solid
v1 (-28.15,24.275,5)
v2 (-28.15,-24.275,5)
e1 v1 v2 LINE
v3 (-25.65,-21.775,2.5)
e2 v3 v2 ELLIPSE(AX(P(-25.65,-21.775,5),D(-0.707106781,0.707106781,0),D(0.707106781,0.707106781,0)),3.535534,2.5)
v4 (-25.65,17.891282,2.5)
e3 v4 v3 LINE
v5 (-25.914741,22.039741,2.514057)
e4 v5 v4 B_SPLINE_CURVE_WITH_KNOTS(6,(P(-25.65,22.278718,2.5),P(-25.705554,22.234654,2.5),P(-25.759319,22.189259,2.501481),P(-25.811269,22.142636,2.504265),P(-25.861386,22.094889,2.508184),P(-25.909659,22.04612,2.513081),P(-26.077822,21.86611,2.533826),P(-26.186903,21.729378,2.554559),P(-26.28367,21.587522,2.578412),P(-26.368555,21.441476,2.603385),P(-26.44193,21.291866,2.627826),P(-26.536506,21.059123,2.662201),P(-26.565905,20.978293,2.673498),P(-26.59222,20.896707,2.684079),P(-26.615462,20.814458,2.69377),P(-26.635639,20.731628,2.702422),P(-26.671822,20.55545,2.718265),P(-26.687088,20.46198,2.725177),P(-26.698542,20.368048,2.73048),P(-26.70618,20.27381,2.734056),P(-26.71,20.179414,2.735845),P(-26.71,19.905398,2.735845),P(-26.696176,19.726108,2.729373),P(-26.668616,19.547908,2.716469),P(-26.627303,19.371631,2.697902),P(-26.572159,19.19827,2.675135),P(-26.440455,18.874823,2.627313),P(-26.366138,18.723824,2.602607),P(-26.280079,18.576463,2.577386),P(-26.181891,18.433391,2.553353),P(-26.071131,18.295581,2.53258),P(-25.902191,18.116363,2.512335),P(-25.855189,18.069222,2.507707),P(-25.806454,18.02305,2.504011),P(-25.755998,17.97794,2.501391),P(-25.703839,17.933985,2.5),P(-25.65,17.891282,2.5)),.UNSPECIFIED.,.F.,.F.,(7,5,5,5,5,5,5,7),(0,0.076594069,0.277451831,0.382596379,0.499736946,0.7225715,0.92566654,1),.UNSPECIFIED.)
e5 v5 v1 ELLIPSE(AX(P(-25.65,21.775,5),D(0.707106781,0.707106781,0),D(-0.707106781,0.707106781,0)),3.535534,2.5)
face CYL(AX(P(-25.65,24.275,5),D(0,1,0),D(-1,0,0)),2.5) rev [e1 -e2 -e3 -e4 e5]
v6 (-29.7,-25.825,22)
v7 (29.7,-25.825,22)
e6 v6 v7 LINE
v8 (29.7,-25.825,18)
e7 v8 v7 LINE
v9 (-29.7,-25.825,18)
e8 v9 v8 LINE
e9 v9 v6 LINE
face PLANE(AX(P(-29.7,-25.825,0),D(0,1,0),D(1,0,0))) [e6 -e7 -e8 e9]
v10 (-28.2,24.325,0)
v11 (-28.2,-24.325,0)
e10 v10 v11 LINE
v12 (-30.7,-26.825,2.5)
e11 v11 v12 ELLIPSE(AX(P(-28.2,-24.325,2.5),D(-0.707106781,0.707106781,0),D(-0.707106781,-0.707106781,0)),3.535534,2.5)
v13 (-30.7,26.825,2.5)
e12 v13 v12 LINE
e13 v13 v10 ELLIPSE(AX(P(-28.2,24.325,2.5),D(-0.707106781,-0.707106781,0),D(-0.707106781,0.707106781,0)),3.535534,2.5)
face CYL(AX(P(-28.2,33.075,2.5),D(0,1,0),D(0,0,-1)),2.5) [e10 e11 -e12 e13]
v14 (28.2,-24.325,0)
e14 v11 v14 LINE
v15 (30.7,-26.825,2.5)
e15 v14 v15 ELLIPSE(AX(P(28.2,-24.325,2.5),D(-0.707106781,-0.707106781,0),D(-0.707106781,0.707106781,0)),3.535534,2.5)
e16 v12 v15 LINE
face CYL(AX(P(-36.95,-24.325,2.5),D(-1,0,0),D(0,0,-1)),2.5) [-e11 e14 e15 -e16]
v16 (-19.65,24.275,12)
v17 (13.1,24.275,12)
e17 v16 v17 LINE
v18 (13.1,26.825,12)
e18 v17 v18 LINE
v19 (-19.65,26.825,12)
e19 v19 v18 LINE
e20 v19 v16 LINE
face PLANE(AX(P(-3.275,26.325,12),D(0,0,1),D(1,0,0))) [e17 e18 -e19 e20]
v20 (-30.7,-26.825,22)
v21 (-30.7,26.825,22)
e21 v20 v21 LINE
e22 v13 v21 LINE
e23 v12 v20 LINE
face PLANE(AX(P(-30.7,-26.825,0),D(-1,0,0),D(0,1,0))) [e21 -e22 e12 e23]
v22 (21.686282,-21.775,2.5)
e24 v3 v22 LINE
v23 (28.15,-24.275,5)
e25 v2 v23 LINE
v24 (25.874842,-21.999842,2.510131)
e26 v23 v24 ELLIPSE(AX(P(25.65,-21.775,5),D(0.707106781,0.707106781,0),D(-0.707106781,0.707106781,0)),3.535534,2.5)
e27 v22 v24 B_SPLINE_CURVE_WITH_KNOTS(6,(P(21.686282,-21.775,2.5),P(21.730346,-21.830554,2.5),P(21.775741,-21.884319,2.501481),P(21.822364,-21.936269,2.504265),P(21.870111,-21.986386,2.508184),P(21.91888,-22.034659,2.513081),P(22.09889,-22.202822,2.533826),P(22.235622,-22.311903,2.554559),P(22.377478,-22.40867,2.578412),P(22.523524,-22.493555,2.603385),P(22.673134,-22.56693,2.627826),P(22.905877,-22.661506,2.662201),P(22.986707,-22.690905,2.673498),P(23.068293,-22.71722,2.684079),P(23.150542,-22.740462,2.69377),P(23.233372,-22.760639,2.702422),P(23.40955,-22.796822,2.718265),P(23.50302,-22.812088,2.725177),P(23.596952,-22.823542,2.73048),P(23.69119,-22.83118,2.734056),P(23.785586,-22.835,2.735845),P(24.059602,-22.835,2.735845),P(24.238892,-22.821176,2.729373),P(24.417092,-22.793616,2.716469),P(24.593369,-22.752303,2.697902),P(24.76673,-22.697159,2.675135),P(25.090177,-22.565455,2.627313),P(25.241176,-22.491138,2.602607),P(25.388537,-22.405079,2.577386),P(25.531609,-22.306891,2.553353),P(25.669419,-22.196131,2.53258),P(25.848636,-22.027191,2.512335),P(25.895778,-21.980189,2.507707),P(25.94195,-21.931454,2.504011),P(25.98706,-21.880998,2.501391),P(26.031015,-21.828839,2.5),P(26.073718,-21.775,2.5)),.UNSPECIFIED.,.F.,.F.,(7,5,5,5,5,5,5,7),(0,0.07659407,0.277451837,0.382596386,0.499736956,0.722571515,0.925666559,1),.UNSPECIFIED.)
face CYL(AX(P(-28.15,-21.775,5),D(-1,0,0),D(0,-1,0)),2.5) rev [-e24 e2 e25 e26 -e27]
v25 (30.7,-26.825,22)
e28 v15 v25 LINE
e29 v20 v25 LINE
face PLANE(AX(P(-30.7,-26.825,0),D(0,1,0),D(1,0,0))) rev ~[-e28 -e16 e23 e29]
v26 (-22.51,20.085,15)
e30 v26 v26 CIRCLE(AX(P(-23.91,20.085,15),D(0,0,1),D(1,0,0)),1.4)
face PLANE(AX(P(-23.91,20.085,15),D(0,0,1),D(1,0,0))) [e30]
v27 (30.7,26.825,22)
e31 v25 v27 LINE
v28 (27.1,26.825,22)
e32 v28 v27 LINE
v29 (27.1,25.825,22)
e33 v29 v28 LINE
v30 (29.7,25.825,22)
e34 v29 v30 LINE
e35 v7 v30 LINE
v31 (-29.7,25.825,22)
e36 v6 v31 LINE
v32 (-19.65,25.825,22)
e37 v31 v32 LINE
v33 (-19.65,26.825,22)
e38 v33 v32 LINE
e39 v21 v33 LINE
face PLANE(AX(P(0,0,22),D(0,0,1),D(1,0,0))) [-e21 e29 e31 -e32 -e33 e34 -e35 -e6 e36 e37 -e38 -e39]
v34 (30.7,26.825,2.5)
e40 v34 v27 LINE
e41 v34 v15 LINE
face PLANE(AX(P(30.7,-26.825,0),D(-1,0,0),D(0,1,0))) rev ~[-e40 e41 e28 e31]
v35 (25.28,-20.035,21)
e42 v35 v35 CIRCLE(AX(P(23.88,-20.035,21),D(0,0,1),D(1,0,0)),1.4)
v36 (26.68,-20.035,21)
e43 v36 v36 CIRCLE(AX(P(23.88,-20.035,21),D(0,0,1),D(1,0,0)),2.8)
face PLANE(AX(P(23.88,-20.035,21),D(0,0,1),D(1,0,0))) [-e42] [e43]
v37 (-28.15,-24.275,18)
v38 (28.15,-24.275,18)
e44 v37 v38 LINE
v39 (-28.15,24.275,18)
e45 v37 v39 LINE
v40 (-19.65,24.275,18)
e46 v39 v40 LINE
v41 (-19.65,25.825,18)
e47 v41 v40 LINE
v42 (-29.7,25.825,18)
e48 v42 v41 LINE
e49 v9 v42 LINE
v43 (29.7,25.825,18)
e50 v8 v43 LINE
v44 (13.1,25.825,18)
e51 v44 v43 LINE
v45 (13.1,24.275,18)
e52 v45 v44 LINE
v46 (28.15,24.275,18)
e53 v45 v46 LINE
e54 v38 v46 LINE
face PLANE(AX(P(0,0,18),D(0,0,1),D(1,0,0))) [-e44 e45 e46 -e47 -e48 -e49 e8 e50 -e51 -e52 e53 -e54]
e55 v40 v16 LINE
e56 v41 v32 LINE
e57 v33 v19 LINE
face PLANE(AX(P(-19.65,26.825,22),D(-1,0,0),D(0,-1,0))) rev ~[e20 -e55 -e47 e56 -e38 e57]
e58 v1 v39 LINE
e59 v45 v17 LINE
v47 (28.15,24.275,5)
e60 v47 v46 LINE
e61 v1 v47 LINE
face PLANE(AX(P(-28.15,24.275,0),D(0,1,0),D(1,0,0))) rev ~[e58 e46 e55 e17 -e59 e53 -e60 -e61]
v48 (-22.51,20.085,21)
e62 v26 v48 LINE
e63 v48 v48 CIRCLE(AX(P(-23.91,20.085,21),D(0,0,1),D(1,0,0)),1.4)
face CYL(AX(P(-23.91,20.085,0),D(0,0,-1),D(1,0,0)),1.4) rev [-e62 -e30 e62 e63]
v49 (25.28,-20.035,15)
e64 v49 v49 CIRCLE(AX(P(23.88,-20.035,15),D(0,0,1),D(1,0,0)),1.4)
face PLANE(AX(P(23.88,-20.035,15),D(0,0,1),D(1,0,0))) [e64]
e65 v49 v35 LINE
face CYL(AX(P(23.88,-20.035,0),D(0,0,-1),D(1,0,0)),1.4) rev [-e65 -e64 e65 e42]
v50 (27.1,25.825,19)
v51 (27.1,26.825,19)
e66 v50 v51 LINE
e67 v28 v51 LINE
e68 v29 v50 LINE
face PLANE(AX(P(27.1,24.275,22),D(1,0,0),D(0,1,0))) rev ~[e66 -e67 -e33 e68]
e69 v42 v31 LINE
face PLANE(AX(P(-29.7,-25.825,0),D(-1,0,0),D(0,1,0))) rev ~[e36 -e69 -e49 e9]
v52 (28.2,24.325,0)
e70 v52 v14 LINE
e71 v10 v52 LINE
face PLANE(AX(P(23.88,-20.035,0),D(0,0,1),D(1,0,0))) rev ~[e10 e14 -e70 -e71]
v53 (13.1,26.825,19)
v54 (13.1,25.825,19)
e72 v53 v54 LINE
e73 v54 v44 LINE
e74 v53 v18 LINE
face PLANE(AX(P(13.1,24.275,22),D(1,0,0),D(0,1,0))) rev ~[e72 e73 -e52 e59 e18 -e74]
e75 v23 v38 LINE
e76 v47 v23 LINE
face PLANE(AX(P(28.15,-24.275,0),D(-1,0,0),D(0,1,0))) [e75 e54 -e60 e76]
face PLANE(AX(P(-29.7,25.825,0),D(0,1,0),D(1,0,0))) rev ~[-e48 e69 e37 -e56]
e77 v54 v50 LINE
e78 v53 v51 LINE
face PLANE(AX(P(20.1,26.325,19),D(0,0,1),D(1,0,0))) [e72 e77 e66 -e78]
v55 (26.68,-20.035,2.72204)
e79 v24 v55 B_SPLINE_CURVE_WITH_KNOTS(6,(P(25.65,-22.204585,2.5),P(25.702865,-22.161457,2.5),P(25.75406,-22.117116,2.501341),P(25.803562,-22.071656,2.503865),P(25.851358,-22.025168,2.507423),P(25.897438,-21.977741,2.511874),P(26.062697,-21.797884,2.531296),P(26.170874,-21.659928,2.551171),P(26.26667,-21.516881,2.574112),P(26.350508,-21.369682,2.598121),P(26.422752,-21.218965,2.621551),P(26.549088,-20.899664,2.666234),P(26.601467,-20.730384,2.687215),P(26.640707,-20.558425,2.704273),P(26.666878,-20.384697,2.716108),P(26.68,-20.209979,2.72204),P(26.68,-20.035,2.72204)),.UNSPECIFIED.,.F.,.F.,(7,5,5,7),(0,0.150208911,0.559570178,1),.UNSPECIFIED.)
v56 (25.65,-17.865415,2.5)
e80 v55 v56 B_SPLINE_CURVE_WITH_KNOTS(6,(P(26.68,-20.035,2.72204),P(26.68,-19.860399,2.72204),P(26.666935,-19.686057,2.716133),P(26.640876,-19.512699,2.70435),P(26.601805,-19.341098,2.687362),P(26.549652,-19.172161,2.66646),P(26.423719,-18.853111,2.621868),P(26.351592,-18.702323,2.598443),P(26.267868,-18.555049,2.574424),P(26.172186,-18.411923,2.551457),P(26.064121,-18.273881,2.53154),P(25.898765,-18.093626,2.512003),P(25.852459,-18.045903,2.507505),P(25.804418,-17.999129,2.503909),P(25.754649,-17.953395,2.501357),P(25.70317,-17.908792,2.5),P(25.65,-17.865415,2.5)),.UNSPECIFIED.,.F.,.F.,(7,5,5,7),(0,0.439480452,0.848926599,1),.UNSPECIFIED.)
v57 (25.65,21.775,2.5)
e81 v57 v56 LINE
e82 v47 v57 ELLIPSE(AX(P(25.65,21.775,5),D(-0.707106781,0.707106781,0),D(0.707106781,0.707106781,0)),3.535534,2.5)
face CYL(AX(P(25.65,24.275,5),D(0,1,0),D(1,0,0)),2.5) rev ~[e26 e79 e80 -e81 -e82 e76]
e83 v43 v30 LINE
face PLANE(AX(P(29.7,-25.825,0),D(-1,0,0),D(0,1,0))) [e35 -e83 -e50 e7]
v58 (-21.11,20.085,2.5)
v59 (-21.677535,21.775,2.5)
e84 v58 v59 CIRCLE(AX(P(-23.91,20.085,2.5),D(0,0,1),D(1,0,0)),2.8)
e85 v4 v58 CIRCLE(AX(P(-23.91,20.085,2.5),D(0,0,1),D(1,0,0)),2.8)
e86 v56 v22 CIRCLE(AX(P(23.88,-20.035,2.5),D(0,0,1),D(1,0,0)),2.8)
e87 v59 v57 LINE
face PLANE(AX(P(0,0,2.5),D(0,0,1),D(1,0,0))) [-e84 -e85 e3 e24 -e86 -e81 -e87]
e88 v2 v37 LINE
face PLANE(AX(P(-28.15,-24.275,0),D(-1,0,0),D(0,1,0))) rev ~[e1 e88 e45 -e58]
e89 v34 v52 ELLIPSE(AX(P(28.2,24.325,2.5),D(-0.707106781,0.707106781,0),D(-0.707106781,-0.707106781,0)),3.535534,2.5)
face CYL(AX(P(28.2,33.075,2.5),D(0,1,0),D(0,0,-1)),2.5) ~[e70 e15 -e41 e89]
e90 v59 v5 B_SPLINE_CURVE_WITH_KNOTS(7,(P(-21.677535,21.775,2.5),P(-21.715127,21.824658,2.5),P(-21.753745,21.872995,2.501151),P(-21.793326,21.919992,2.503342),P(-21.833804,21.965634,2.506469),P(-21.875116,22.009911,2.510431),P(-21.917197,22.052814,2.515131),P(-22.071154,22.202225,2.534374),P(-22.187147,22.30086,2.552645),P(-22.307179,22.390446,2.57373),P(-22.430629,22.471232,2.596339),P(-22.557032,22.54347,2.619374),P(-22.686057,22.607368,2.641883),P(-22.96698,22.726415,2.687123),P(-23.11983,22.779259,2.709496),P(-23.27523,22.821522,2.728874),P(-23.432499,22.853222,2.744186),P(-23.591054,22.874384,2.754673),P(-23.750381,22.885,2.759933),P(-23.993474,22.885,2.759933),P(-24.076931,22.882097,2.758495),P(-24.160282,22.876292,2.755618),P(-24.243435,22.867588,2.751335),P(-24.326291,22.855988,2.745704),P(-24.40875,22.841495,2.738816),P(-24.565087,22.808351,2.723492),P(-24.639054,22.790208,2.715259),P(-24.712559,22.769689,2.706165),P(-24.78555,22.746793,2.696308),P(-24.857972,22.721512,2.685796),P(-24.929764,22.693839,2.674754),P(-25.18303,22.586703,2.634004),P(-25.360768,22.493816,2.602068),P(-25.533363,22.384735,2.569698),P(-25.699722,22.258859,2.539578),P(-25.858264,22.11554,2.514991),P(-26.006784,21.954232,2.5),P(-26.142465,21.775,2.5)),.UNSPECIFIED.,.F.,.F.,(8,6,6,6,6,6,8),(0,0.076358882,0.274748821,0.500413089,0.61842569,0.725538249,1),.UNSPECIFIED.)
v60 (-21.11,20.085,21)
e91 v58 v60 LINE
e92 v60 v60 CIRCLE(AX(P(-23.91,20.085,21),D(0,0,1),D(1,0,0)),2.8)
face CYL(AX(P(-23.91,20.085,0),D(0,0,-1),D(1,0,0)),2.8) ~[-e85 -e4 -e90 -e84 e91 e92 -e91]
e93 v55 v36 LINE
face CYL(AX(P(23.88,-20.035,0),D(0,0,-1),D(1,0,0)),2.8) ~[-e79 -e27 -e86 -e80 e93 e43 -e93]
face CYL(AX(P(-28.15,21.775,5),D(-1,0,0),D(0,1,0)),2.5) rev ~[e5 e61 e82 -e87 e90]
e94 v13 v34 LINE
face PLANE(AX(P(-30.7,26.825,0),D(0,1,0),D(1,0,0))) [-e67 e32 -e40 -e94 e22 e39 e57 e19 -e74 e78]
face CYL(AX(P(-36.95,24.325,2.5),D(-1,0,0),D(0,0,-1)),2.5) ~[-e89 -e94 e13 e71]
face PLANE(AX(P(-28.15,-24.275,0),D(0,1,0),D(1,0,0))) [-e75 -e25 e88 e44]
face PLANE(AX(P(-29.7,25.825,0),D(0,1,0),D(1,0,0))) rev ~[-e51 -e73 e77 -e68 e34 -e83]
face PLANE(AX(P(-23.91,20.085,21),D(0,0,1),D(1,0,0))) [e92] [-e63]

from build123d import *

# Parameters (mm, degrees)
F0_W        = 56.3
F0_H        = 48.55
F0_R        = 2.8
F1_DEPTH    = 2.5
F0_W_2      = 59.4
F0_H_2      = 51.65
F2_DEPTH    = 18
F0_W_3      = 61.4
F0_H_3      = 53.65
F3_DEPTH    = 22
F0_R_2      = 1.4
F4_DEPTH    = 21
F5_DEPTH    = 15
F6_T1_DEPTH = 48.55
F6_T3_DEPTH = 56.3
F6_T5_DEPTH = 73.9
F6_T7_DEPTH = 66.15
F7_W        = 32.75
F7_H        = 1
F7_H_2      = 1.55
F8_DEPTH    = 10
F7_W_2      = 14
F9_DEPTH    = 3


# Not quite as in the source:
# - a fillet or chamfer that OpenCascade refuses, or shapes differently, is made with other operations: its cross-section is extruded or revolved along the edge and cut away or added


with BuildPart() as f1:
    # F0 (on Top) → F1 (new body)
    with BuildSketch(Plane.XY):
        Rectangle(F0_W, F0_H)
        with Locations((23.88, -20.035)):
            Circle(F0_R, mode=Mode.SUBTRACT)
        with Locations((-23.91, 20.085)):
            Circle(F0_R, mode=Mode.SUBTRACT)
    extrude(amount=F1_DEPTH)

    # F0 (on Top) → F2 (join)
    with BuildSketch(Plane.XY):
        Rectangle(F0_W_2, F0_H_2)
        Rectangle(F0_W, F0_H, mode=Mode.SUBTRACT)
    extrude(amount=F2_DEPTH)

    # F0 (on Top) → F3 (join)
    with BuildSketch(Plane.XY):
        Rectangle(F0_W_3, F0_H_3)
        Rectangle(F0_W_2, F0_H_2, mode=Mode.SUBTRACT)
    extrude(amount=F3_DEPTH)

    # F0 (on Top) → F4 (join)
    with BuildSketch(Plane.XY):
        with Locations((-23.91, 20.085)):
            Circle(F0_R)
        with Locations((-23.91, 20.085)):
            Circle(F0_R_2, mode=Mode.SUBTRACT)
        with Locations((23.88, -20.035)):
            Circle(F0_R)
        with Locations((23.88, -20.035)):
            Circle(F0_R_2, mode=Mode.SUBTRACT)
    extrude(amount=F4_DEPTH)

    # F0 (on Top) → F5 (join)
    with BuildSketch(Plane.XY):
        with Locations((23.88, -20.035)):
            Circle(F0_R_2)
        with Locations((-23.91, 20.085)):
            Circle(F0_R_2)
    extrude(amount=F5_DEPTH)

    # F6: fillet of radius 2.5 on 8 edges, made by hand

    # F6_s2 → F6_t1 (join)
    with BuildSketch(Plane.XZ.offset(-24.275)):
        with BuildLine():
            ThreePointArc((28.15, 5), (27.417766953, 3.232233047), (25.65, 2.5))
            Line((25.65, 2.5), (28.15, 2.5))
            Line((28.15, 2.5), (28.15, 5))
        make_face()
        with BuildLine():
            ThreePointArc((-28.15, 5), (-27.417766953, 3.232233047), (-25.65, 2.5))
            Line((-25.65, 2.5), (-28.15, 2.5))
            Line((-28.15, 2.5), (-28.15, 5))
        make_face()
    extrude(amount=F6_T1_DEPTH)

    # F6_s4 → F6_t3 (join)
    with BuildSketch(Plane.YZ.offset(-28.15)):
        with BuildLine():
            ThreePointArc((24.275, 5), (23.542766953, 3.232233047), (21.775, 2.5))
            Line((21.775, 2.5), (24.275, 2.5))
            Line((24.275, 2.5), (24.275, 5))
        make_face()
        with BuildLine():
            ThreePointArc((-24.275, 5), (-23.542766953, 3.232233047), (-21.775, 2.5))
            Line((-21.775, 2.5), (-24.275, 2.5))
            Line((-24.275, 2.5), (-24.275, 5))
        make_face()
    extrude(amount=F6_T3_DEPTH)

    # F6_s6 → F6_t5 (cut)
    with BuildSketch(Plane.YZ.offset(-36.95)):
        with BuildLine():
            ThreePointArc((-24.325, 0), (-26.092766953, 0.732233047), (-26.825, 2.5))
            Line((-26.825, 2.5), (-26.825, 0))
            Line((-26.825, 0), (-24.325, 0))
        make_face()
        with BuildLine():
            ThreePointArc((24.325, 0), (26.092766953, 0.732233047), (26.825, 2.5))
            Line((26.825, 2.5), (26.825, 0))
            Line((26.825, 0), (24.325, 0))
        make_face()
    extrude(amount=F6_T5_DEPTH, mode=Mode.SUBTRACT)

    # F6_s8 → F6_t7 (cut)
    with BuildSketch(Plane.XZ.offset(-33.075)):
        with BuildLine():
            ThreePointArc((28.2, 0), (29.967766953, 0.732233047), (30.7, 2.5))
            Line((30.7, 2.5), (30.7, 0))
            Line((30.7, 0), (28.2, 0))
        make_face()
        with BuildLine():
            ThreePointArc((-28.2, 0), (-29.967766953, 0.732233047), (-30.7, 2.5))
            Line((-30.7, 2.5), (-30.7, 0))
            Line((-30.7, 0), (-28.2, 0))
        make_face()
    extrude(amount=F6_T7_DEPTH, mode=Mode.SUBTRACT)

    # F7 (on face) → F8 (cut)
    with BuildSketch(Plane.XY.offset(22)):
        with Locations((-3.275, 26.325)):
            Rectangle(F7_W, F7_H)
        with Locations((-3.275, 25.05)):
            Rectangle(F7_W, F7_H_2)
    extrude(amount=-F8_DEPTH, mode=Mode.SUBTRACT)

    # F7 (on face) → F9 (cut)
    with BuildSketch(Plane.XY.offset(22)):
        with Locations((20.1, 26.325)):
            Rectangle(F7_W_2, F7_H)
        with Locations((20.1, 25.05)):
            Rectangle(F7_W_2, F7_H_2)
    extrude(amount=-F9_DEPTH, mode=Mode.SUBTRACT)


solid = f1.part
